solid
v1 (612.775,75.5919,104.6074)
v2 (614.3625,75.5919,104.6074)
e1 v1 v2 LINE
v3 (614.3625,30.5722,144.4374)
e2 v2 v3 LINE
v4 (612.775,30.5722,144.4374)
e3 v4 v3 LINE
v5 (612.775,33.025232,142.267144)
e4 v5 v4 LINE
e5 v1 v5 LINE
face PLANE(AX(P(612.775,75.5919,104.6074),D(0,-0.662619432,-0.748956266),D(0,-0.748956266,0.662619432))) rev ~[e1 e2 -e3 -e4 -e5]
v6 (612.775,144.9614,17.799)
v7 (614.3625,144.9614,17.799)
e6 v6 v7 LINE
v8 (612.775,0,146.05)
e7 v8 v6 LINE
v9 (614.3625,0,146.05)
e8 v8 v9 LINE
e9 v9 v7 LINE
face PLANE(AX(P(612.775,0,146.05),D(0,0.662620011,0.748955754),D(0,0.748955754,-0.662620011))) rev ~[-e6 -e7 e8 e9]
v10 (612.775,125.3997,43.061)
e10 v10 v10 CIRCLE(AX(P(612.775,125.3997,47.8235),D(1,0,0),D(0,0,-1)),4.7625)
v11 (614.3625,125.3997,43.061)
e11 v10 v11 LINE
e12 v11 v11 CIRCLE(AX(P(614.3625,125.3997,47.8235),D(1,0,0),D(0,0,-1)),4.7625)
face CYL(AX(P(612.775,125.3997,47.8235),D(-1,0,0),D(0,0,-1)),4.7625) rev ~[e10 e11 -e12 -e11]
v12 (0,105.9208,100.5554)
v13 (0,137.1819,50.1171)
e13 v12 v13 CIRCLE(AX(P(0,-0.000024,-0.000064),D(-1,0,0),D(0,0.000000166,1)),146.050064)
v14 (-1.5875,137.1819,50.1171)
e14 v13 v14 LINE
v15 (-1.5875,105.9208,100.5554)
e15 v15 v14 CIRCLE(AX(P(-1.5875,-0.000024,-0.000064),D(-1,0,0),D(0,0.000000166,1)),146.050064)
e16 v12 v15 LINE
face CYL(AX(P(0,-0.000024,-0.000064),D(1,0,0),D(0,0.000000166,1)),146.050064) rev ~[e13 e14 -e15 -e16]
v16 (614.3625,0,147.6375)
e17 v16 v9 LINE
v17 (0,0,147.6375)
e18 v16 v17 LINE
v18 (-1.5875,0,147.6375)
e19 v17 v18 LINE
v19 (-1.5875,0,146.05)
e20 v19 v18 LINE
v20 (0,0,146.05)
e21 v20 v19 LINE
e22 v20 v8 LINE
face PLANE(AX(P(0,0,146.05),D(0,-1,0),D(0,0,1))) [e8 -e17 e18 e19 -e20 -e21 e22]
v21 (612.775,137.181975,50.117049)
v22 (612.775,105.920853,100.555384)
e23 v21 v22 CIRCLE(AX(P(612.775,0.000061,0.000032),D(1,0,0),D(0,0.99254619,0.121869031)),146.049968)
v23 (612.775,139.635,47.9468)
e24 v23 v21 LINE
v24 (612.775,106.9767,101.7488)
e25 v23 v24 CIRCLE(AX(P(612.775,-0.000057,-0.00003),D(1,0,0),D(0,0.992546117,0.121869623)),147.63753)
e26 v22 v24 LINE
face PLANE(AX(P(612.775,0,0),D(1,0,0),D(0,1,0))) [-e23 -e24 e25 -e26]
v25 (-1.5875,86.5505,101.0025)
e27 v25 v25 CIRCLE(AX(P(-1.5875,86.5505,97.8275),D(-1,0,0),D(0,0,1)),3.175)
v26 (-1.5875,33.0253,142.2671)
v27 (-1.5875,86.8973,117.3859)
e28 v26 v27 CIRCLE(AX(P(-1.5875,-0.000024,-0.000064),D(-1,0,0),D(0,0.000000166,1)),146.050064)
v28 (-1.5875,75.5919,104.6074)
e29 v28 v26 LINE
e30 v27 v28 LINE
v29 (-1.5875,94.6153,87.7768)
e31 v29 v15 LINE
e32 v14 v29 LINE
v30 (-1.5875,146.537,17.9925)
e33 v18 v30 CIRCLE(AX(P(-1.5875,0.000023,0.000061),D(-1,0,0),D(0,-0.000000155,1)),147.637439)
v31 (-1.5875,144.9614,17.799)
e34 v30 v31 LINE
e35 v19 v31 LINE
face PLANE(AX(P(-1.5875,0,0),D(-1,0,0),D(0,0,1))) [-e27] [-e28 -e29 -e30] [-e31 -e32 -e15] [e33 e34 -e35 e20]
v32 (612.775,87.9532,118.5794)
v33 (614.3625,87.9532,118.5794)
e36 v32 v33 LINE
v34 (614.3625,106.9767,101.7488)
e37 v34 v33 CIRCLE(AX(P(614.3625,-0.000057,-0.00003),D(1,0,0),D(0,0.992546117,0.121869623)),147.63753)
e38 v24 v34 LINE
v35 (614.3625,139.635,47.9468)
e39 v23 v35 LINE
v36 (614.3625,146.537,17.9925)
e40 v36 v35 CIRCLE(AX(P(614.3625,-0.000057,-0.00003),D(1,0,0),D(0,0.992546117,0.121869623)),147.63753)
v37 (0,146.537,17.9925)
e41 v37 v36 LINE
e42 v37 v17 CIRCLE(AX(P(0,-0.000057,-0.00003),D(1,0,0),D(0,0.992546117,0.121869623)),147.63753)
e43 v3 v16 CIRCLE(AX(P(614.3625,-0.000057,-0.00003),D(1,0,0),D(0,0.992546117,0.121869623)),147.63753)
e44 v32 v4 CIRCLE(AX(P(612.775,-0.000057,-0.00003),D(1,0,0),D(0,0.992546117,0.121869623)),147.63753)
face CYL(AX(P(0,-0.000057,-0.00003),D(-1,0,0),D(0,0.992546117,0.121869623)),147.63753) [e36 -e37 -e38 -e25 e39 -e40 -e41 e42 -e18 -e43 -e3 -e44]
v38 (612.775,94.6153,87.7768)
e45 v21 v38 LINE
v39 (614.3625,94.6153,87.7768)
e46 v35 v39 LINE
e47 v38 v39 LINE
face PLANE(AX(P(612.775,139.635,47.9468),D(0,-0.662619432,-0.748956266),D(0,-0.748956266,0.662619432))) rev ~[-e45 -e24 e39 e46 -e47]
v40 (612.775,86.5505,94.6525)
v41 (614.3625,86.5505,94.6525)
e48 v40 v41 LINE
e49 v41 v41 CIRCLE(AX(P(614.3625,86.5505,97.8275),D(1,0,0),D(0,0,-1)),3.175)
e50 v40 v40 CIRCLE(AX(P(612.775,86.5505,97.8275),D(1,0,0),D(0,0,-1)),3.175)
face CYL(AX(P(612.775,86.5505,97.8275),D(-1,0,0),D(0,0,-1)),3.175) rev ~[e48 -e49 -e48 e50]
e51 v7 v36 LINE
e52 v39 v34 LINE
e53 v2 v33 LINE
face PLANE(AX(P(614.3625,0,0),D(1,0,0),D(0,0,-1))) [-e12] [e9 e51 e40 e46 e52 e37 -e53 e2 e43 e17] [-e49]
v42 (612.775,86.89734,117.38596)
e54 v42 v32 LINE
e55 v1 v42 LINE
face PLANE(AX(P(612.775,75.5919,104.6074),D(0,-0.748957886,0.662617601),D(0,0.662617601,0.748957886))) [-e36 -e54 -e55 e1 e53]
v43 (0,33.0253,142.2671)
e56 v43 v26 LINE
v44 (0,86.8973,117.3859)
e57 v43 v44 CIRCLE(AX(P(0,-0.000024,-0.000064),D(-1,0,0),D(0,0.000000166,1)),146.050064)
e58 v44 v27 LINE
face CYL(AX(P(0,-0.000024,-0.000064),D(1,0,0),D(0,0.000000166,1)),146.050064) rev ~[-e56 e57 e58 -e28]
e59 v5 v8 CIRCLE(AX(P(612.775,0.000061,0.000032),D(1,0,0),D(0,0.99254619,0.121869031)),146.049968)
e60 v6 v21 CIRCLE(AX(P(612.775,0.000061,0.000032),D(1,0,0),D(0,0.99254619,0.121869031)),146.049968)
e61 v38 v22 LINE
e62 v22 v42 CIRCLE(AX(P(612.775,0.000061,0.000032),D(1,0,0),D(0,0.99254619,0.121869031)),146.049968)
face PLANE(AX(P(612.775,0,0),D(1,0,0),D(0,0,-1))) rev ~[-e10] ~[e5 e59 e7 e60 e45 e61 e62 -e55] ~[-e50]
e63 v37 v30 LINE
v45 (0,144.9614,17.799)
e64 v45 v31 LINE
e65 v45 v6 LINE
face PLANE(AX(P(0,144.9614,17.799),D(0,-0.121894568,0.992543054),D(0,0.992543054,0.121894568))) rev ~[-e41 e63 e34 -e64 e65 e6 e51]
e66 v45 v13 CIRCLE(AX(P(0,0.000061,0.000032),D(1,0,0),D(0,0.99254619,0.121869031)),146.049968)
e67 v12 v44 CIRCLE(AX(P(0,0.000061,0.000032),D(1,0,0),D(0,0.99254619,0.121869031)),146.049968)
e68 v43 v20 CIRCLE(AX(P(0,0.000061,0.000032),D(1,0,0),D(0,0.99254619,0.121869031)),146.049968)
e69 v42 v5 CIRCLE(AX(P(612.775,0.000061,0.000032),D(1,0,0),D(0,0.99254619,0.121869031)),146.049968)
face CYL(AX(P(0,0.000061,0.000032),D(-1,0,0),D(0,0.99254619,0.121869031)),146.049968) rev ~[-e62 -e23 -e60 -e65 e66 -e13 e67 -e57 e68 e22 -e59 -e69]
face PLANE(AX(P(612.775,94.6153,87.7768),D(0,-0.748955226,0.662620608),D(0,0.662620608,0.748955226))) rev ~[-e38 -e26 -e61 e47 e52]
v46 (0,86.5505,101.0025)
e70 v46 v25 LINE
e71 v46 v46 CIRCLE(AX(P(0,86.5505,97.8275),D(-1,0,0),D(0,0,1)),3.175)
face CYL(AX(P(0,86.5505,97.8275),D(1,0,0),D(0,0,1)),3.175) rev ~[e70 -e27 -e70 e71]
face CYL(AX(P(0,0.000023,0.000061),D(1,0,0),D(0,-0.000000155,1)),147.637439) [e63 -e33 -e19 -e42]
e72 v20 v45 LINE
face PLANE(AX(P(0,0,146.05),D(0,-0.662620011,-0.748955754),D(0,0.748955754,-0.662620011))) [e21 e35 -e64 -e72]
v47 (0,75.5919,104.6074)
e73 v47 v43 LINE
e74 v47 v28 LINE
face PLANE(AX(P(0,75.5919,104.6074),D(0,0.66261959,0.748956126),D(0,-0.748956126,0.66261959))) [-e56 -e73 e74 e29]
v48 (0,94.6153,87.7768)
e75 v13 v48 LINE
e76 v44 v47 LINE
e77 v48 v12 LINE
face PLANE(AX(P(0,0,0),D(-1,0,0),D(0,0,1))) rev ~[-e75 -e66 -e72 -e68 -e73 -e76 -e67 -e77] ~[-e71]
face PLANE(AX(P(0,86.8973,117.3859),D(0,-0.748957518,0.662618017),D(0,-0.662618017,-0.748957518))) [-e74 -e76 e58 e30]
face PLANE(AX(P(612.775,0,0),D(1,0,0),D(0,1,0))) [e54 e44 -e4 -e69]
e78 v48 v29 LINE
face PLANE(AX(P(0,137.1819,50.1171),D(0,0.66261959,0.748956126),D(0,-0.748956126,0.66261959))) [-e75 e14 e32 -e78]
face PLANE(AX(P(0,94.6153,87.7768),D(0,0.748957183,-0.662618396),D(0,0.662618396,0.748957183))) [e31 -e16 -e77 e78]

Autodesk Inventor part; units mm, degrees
ref_plane "YZ Plane" through (0, 0, 0) normal (1, 0, 0) x (0, 1, 0)
ref_plane "XZ Plane" through (0, 0, 0) normal (0, 1, 0) x (-1, 0, 0)
ref_plane "XY Plane" through (0, 0, 0) normal (0, 0, 1) x (1, 0, 0)
sketch "Sketch1" plane through (0, 0, 0) normal (1, 0, 0) x (0, 1, 0)
  arc A0 (144.9614, 17.799) -> (0, 146.05) centre (0, 0) ccw
  line L0 (0, 0) -> (144.9614, 17.799) construction
  line L1 (0, 0) -> (0, 146.05) construction
  arc A1 (146.537, 17.9925) -> (0, 147.6375) centre (0, 0) ccw
  line L2 (0, 146.05) -> (0, 147.6375)
  line L3 (144.9614, 17.799) -> (146.537, 17.9925)
  dimension "d0" = 146.05
  dimension "d1" = 83
  dimension "d2" = 1.5875
extrude "Extrusion1" add sketch "Sketch1" along normal blind 612.775
sketch "Sketch2" plane through (612.775, 0, 0) normal (1, 0, 0) x (0, 0, -1)
  arc A0 (-17.799, 144.9614) -> (-146.05, 0) centre (0, 0) ccw construction
  line L0 (-146.05, 0) -> (0, 0) construction
  line L1 (-17.799, 144.9614) -> (0, 0) construction
  line L2 (0, 0) -> (-109.385, 96.7757) construction
  circle A1 centre (-97.8275, 86.5505) radius 3.175
  arc A2 (-17.9925, 146.537) -> (-147.6375, 0) centre (0, 0) ccw projected
  line L3 (-146.05, 0) -> (-17.799, 144.9614)
  line L4 (-47.9468, 139.635) -> (-87.7768, 94.6153)
  line L5 (-87.7768, 94.6153) -> (-101.7488, 106.9767)
  line L6 (-104.6074, 75.5919) -> (-118.5794, 87.9532)
  line L7 (-89.4123, 96.0622) -> (-106.2428, 77.0388) construction
  line L8 (-87.7768, 94.6153) -> (-104.6074, 75.5919) construction
  line L9 (-104.6074, 75.5919) -> (-144.4374, 30.5722)
  arc A3 (-101.7488, 106.9767) -> (-118.5794, 87.9532) centre (0, 0) ccw
  arc A4 (-144.4374, 30.5722) -> (-147.6375, 0) centre (0, 0) ccw
  line L10 (-147.6375, 0) -> (-146.05, 0) projected
  line L11 (-146.05, 0) -> (-147.6375, 0)
  arc A5 (-17.9925, 146.537) -> (-47.9468, 139.635) centre (0, 0) ccw
  line L12 (-17.799, 144.9614) -> (-17.9925, 146.537) projected
  line L13 (-17.9925, 146.537) -> (-17.799, 144.9614)
  line L14 (-54.9573, 131.7111) -> (-40.6897, 119.0882) construction
  circle A6 centre (-47.8235, 125.3997) radius 4.7625
  dimension "d5" = 6.35
  dimension "d6" = 130.6186
  dimension "d7" = 25.4
  dimension "d8" = 19.05
  dimension "d19" = 62.23
  dimension "d23" = 9.525
extrude "Extrusion2" add sketch "Sketch2" along normal blind 1.5875 contours L12 L3 L10 A2 L9 L6 L5 L4
sketch "Sketch3" plane through (0, 0, 0) normal (-1, 0, 0) x (0, 0, 1)
  arc A0 (146.05, 0) -> (142.2671, 33.0253) centre (0, 0) ccw projected
  line L0 (104.6074, 75.5919) -> (142.2671, 33.0253) projected
  line L1 (117.3859, 86.8973) -> (104.6074, 75.5919) projected
  arc A1 (117.3859, 86.8973) -> (100.5554, 105.9208) centre (0, 0) ccw projected
  line L2 (87.7768, 94.6153) -> (100.5554, 105.9208) projected
  line L3 (50.1171, 137.1819) -> (87.7768, 94.6153) projected
  arc A2 (50.1171, 137.1819) -> (17.799, 144.9614) centre (0, 0) ccw projected
  line L4 (146.05, 0) -> (17.799, 144.9614) projected
  circle A3 centre (97.8275, 86.5505) radius 3.175 projected
  arc A4 (146.05, 0) -> (17.799, 144.9614) centre (0, 0) ccw projected
  line L5 (146.05, 0) -> (147.6375, 0) projected
  arc A5 (147.6375, 0) -> (17.9925, 146.537) centre (0, 0) ccw projected
  line L6 (17.9925, 146.537) -> (17.799, 144.9614) projected
extrude "Extrusion3" add sketch "Sketch3" along normal blind 1.5875 contours L4 A2 L3 L2 A1 L1 L0 A0 | A0 A4 A1 A2 L6 A5 L5
properties part number "Kick Plate"
